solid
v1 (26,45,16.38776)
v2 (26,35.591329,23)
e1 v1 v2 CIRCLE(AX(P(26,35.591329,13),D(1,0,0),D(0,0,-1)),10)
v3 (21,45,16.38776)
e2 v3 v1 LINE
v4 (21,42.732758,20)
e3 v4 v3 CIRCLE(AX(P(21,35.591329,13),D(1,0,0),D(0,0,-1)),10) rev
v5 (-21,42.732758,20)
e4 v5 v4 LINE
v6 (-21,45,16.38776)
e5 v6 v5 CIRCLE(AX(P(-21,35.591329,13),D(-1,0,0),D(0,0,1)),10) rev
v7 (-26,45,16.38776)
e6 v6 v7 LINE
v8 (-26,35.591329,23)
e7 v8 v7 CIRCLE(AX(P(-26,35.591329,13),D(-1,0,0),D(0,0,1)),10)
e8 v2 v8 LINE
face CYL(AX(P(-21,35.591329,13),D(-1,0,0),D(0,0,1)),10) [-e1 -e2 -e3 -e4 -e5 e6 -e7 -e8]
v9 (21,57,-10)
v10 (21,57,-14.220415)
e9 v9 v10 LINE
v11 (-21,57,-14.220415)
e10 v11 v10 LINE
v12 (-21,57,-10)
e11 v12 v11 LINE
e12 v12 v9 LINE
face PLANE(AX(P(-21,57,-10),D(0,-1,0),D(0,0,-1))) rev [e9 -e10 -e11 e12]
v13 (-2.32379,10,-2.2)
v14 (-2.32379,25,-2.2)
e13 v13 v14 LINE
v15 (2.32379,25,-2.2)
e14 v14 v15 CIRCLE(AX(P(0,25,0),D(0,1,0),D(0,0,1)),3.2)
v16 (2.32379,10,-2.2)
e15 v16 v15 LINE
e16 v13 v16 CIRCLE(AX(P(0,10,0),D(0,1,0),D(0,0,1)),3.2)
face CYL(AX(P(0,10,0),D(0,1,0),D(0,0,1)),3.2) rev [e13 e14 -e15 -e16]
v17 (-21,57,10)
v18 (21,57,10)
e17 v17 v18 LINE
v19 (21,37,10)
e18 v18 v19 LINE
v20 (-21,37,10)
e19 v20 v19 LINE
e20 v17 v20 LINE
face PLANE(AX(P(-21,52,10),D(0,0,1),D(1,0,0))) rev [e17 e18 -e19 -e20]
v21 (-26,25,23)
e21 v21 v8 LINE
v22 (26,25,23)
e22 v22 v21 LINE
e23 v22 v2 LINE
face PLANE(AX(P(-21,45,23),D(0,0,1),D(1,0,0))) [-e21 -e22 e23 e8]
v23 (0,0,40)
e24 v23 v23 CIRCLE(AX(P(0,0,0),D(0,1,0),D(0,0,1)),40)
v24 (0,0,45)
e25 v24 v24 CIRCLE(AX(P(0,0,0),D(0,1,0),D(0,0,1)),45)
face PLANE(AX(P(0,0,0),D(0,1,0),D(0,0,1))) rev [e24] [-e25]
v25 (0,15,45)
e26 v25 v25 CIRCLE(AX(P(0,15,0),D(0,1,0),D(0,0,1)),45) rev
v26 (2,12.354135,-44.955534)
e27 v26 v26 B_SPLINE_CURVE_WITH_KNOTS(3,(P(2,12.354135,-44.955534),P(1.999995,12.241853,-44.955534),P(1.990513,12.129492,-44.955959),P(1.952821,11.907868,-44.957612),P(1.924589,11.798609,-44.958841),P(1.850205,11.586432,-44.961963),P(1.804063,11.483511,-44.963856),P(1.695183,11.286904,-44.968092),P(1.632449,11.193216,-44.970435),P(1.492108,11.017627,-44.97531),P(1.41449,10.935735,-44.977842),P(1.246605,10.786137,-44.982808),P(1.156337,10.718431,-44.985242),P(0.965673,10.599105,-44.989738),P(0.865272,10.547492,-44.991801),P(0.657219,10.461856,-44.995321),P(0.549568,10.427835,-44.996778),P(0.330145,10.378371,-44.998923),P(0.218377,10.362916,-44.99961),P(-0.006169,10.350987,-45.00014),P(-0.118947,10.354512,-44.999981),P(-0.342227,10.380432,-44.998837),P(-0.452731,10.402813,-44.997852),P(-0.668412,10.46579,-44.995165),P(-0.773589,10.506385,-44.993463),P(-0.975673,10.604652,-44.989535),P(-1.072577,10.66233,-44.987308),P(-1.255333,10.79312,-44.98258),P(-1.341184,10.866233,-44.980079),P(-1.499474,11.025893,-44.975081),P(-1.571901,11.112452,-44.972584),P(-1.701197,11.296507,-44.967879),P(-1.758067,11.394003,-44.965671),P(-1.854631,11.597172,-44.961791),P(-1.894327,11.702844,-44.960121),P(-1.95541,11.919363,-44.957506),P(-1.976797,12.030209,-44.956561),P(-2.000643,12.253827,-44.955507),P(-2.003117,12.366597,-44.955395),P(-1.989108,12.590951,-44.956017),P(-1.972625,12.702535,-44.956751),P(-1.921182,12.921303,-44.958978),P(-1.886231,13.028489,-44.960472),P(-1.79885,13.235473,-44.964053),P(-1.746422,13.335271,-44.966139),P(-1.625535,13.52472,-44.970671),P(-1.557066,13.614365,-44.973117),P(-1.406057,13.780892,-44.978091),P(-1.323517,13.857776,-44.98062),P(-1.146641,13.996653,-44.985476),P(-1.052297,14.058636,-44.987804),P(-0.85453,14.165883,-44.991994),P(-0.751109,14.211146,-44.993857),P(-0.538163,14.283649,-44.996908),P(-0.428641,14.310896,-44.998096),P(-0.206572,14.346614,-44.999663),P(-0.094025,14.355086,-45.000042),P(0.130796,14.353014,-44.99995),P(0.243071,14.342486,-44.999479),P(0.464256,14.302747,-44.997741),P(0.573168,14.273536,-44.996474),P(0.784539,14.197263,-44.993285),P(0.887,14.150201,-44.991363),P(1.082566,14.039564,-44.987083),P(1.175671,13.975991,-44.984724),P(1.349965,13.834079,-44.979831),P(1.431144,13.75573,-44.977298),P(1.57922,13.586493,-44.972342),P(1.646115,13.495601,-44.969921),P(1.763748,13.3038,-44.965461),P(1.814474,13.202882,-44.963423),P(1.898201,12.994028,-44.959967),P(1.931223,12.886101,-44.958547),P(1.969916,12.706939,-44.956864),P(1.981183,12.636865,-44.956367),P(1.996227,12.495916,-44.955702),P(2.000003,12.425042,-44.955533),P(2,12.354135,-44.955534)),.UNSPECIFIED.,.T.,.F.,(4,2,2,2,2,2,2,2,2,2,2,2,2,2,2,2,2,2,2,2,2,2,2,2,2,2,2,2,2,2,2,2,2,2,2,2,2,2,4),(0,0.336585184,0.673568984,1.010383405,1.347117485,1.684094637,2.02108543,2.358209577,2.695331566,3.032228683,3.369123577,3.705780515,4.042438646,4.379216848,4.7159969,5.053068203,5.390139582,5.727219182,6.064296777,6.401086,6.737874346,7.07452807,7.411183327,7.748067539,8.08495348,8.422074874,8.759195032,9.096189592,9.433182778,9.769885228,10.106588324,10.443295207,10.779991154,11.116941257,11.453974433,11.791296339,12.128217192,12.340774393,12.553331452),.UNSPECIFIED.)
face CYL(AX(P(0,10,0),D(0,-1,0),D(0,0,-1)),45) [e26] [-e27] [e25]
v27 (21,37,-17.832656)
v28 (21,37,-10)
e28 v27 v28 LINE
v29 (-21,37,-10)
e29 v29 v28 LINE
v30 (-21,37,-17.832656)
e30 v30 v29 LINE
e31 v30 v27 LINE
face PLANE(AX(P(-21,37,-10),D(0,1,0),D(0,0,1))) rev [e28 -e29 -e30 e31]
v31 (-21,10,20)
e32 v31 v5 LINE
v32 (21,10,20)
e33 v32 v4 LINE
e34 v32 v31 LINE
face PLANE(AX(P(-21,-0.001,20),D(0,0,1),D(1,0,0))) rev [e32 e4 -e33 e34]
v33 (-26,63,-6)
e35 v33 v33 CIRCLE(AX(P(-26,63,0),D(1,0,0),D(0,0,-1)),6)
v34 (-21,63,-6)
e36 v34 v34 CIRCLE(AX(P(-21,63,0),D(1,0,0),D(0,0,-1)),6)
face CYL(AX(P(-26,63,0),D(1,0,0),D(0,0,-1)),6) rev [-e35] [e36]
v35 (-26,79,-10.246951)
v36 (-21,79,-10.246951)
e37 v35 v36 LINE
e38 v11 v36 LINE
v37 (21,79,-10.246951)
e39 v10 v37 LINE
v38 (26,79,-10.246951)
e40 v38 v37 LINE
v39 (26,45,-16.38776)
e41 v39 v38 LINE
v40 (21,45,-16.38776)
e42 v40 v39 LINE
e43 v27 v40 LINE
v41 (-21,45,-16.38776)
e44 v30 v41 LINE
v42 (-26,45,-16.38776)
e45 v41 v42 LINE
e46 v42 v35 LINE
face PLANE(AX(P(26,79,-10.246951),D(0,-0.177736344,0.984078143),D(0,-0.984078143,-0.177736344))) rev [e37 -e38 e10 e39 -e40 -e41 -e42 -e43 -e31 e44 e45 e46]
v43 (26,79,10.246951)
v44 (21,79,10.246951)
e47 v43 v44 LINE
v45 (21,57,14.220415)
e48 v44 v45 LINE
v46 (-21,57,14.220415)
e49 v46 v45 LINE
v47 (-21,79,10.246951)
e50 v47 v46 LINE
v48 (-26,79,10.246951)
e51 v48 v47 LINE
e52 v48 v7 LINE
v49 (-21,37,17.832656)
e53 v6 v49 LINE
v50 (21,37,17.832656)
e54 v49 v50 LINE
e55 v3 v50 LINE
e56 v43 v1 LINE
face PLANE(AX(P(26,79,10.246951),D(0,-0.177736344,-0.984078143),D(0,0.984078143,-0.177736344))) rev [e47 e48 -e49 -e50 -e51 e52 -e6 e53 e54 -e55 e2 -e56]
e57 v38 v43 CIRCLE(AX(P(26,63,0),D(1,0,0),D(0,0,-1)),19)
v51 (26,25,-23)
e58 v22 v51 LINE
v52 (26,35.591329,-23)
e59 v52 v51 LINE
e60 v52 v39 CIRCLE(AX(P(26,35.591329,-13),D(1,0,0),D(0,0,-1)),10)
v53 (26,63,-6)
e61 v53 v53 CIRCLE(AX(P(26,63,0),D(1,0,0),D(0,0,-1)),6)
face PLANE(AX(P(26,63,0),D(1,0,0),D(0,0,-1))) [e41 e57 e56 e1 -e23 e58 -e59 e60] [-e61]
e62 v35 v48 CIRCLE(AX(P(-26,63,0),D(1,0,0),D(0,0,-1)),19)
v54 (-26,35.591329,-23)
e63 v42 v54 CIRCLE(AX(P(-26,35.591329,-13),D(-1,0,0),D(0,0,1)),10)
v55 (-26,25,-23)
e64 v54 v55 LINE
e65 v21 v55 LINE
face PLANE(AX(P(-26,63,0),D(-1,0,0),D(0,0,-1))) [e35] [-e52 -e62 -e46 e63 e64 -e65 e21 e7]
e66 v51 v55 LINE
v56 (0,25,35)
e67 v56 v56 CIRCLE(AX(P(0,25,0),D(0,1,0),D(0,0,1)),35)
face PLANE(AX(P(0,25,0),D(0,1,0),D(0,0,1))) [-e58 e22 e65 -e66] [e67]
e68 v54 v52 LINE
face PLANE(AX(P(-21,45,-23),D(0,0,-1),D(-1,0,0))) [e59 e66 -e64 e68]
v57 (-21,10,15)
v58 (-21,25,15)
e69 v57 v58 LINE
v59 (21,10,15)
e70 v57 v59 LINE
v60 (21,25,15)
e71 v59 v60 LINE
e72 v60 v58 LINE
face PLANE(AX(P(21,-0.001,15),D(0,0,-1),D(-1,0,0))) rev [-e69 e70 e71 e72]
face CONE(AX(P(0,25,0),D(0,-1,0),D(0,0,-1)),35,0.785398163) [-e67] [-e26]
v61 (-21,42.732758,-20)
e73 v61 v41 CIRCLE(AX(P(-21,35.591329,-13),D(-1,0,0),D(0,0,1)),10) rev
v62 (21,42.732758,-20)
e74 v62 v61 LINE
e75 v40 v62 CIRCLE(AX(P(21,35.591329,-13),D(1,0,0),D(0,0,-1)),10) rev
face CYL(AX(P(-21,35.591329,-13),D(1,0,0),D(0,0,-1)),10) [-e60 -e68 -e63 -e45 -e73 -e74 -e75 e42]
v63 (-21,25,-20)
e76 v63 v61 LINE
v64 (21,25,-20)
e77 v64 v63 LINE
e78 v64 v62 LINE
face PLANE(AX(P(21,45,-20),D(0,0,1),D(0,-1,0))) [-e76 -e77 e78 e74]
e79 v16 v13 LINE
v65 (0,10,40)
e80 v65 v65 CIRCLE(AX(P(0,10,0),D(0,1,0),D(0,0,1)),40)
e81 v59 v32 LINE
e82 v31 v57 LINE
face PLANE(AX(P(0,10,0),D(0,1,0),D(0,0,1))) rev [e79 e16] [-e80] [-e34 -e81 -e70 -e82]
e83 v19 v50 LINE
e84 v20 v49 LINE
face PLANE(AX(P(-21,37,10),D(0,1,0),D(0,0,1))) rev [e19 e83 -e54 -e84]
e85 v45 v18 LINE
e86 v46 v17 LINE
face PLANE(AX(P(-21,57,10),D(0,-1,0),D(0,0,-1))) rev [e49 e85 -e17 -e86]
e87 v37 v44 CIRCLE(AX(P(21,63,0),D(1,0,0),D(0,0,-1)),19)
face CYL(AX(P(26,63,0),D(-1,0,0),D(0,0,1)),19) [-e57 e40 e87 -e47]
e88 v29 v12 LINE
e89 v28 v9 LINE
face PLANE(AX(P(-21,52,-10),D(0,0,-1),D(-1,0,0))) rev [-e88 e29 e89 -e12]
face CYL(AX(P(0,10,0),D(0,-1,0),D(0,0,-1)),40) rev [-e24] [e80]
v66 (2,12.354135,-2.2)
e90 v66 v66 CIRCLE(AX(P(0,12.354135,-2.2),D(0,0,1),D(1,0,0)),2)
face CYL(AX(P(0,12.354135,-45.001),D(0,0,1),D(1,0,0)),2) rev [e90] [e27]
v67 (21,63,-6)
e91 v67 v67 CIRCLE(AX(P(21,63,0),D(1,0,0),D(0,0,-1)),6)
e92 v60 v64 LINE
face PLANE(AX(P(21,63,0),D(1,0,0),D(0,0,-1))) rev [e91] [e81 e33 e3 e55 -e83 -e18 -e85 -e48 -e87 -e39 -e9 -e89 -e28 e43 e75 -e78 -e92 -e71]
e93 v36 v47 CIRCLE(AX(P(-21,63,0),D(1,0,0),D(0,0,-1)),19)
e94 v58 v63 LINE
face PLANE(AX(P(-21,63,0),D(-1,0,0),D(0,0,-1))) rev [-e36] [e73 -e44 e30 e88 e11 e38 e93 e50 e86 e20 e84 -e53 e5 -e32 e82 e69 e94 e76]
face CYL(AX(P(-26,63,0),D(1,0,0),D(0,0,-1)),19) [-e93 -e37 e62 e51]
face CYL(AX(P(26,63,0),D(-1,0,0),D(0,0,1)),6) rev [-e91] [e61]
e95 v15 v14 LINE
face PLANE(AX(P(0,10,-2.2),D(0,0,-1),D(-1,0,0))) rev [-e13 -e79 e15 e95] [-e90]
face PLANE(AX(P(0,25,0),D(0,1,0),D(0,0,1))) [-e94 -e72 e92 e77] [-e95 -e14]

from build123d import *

# Parameters (mm, degrees)
SKETCH1_R               = 45
SKETCH1_R_2             = 40
BOSS_EXTRUDE1_DEPTH     = 10
BOSS_EXTRUDE2_START     = -15
SKETCH2_R               = 45
BOSS_EXTRUDE2_DEPTH     = 15
CHAMFER1_SIZE           = 10
CUT_EXTRUDE1_REACH      = 71.842
CUT_EXTRUDE1_END_RADIUS = 45
SKETCH4_R               = 2
SKETCH9_R               = 6
BOSS_EXTRUDE4_DEPTH     = 5
BOSS_EXTRUDE5_DEPTH     = 42
CUT_EXTRUDE2_REACH      = 87.434
BOSS_EXTRUDE6_DEPTH     = 5
SKETCH14_W              = 3
SKETCH14_H              = 20
BOSS_EXTRUDE7_DEPTH     = 42
FILLET1_START           = -27
FILLET1_DEPTH           = 54
FILLET2_START           = -27
FILLET2_DEPTH           = 54


with BuildPart() as part:
    # Sketch1 → Boss-Extrude1 (new body)
    with BuildSketch(Plane(origin=(0, 0, 0), x_dir=(1, 0, 0), z_dir=(0, 1, 0))):
        with Locations(Location((0, 0, 0), (0, 0, 270))):
            Circle(SKETCH1_R)
        with Locations(Location((0, 0, 0), (0, 0, 270))):
            Circle(SKETCH1_R_2, mode=Mode.SUBTRACT)
    extrude(amount=BOSS_EXTRUDE1_DEPTH)

    # Sketch2 → Boss-Extrude2 (add)
    with BuildSketch(Plane(origin=(0, 25, 0), x_dir=(1, 0, 0), z_dir=(0, 1, 0)).offset(BOSS_EXTRUDE2_START)):
        with Locations(Location((0, 0, 0), (0, 0, 270))):
            Circle(SKETCH2_R)
        with BuildLine():
            Line((-2.323790008, 2.2), (2.323790008, 2.2))
            ThreePointArc((2.323790008, 2.2), (0, -3.2), (-2.323790008, 2.2))
        make_face(mode=Mode.SUBTRACT)
    extrude(amount=BOSS_EXTRUDE2_DEPTH)

    # Chamfer1
    chamfer1_edges = [part.edges().sort_by_distance(p)[0] for p in [
        (0, 25, -45),
    ]]
    chamfer(chamfer1_edges, length=CHAMFER1_SIZE)

    # Cut-Extrude1: up to this cylinder (the profile starts inside it)
    cut_extrude1_end = Plane(origin=(0, 12.354135, 0), z_dir=(0, -1, 0)) * Cylinder(CUT_EXTRUDE1_END_RADIUS, 234.684, mode=Mode.PRIVATE)
    # Sketch4 → Cut-Extrude1 (cut, up to the surface)
    with BuildSketch(Plane.XY.offset(-2.2), mode=Mode.PRIVATE) as cut_extrude1_sk1:
        with Locations((0, 12.354134675)):
            Circle(SKETCH4_R)
    cut_extrude1_tool1 = extrude(cut_extrude1_sk1.sketch, amount=-CUT_EXTRUDE1_REACH, mode=Mode.PRIVATE) & cut_extrude1_end
    add(cut_extrude1_tool1.solids().sort_by_distance((0, 12.354135, -2.2))[0], mode=Mode.SUBTRACT)

    # Sketch9 → Boss-Extrude4 (add)
    with BuildSketch(Plane(origin=(21, 0, 0), x_dir=(0, 0, -1), z_dir=(1, 0, 0))):
        with BuildLine():
            Line((20, 25), (-20, 25))
            Line((-20, 25), (-10.246950766, 79))
            ThreePointArc((-10.246950766, 79), (0, 82), (10.246950766, 79))
            Line((10.246950766, 79), (20, 25))
        make_face()
        with Locations((0, 63)):
            Circle(SKETCH9_R, mode=Mode.SUBTRACT)
    boss_extrude4 = extrude(amount=BOSS_EXTRUDE4_DEPTH)

    # Mirror2: Boss-Extrude4 across plane
    add(boss_extrude4.mirror(Plane(origin=(0, 0, 0), x_dir=(0, 0, 1), z_dir=(1, 0, 0))))

    # Sketch10 → Boss-Extrude5 (add)
    with BuildSketch(Plane.ZY.offset(-21)):
        Polygon((-10, 57), (-14.220415269, 57), (-17.832655726, 37), (-10, 37), (-10, 52), align=None)
        Polygon((10, 52), (10, 57), (14.220415269, 57), (17.832655726, 37), (10, 37), align=None)
    extrude(amount=BOSS_EXTRUDE5_DEPTH)

    # Sketch11 → Cut-Extrude2 (cut, up to next)
    with BuildSketch(Plane(origin=(0, 25, 0), x_dir=(1, 0, 0), z_dir=(0, 1, 0)), mode=Mode.PRIVATE) as cut_extrude2_sk1:
        Polygon((-21, -17.832655726), (-21, -20), (21, -20), (21, -15), (-21, -15), align=None)
    cut_extrude2_tool1 = extrude(cut_extrude2_sk1.sketch, amount=-CUT_EXTRUDE2_REACH, mode=Mode.PRIVATE) & part.part
    add(cut_extrude2_tool1.solids().sort_by_distance((0, 25, 17.5))[0], mode=Mode.SUBTRACT)

    # Sketch13 → Boss-Extrude6 (add)
    with BuildSketch(Plane.ZY.offset(26)):
        Polygon((20, 25), (16.387759543, 45), (20, 45), (23, 45), (23, 25), align=None)
        Polygon((-23, 25), (-20, 25), (-16.387759543, 45), (-20, 45), (-23, 45), align=None)
    boss_extrude6 = extrude(amount=-BOSS_EXTRUDE6_DEPTH)

    # Mirror3: Boss-Extrude6 across plane
    add(boss_extrude6.mirror(Plane(origin=(0, 0, 0), x_dir=(0, 0, 1), z_dir=(1, 0, 0))))

    # Sketch14 → Boss-Extrude7 (add)
    with BuildSketch(Plane(origin=(-21, 0, 0), x_dir=(0, 0, -1), z_dir=(1, 0, 0))):
        with Locations((-21.5, 35)):
            Rectangle(SKETCH14_W, SKETCH14_H)
    boss_extrude7 = extrude(amount=BOSS_EXTRUDE7_DEPTH)

    # Mirror4: Boss-Extrude7 across plane
    add(boss_extrude7.mirror(Plane.XY))

    # Fillet1: read off the stored shape, not the designer's step
    # Fillet1 outline → Fillet1 (cut)
    with BuildSketch(Plane.YZ.offset(FILLET1_START)):
        with BuildLine():
            Line((45, 23), (35.59132925, 23))
            ThreePointArc((35.59132925, 23), (41.341216404, 21.181613393), (45, 16.387759543))
            Line((45, 16.387759543), (45, 23))
        make_face()
    extrude(amount=FILLET1_DEPTH, mode=Mode.SUBTRACT)

    # Fillet2: read off the stored shape, not the designer's step
    # Fillet2 outline → Fillet2 (cut)
    with BuildSketch(Plane.YZ.offset(FILLET2_START)):
        with BuildLine():
            Line((35.59132925, -23), (45, -23))
            Line((45, -23), (45, -16.387759543))
            ThreePointArc((45, -16.387759543), (41.341216404, -21.181613393), (35.59132925, -23))
        make_face()
    extrude(amount=FILLET2_DEPTH, mode=Mode.SUBTRACT)


solid = part.part
